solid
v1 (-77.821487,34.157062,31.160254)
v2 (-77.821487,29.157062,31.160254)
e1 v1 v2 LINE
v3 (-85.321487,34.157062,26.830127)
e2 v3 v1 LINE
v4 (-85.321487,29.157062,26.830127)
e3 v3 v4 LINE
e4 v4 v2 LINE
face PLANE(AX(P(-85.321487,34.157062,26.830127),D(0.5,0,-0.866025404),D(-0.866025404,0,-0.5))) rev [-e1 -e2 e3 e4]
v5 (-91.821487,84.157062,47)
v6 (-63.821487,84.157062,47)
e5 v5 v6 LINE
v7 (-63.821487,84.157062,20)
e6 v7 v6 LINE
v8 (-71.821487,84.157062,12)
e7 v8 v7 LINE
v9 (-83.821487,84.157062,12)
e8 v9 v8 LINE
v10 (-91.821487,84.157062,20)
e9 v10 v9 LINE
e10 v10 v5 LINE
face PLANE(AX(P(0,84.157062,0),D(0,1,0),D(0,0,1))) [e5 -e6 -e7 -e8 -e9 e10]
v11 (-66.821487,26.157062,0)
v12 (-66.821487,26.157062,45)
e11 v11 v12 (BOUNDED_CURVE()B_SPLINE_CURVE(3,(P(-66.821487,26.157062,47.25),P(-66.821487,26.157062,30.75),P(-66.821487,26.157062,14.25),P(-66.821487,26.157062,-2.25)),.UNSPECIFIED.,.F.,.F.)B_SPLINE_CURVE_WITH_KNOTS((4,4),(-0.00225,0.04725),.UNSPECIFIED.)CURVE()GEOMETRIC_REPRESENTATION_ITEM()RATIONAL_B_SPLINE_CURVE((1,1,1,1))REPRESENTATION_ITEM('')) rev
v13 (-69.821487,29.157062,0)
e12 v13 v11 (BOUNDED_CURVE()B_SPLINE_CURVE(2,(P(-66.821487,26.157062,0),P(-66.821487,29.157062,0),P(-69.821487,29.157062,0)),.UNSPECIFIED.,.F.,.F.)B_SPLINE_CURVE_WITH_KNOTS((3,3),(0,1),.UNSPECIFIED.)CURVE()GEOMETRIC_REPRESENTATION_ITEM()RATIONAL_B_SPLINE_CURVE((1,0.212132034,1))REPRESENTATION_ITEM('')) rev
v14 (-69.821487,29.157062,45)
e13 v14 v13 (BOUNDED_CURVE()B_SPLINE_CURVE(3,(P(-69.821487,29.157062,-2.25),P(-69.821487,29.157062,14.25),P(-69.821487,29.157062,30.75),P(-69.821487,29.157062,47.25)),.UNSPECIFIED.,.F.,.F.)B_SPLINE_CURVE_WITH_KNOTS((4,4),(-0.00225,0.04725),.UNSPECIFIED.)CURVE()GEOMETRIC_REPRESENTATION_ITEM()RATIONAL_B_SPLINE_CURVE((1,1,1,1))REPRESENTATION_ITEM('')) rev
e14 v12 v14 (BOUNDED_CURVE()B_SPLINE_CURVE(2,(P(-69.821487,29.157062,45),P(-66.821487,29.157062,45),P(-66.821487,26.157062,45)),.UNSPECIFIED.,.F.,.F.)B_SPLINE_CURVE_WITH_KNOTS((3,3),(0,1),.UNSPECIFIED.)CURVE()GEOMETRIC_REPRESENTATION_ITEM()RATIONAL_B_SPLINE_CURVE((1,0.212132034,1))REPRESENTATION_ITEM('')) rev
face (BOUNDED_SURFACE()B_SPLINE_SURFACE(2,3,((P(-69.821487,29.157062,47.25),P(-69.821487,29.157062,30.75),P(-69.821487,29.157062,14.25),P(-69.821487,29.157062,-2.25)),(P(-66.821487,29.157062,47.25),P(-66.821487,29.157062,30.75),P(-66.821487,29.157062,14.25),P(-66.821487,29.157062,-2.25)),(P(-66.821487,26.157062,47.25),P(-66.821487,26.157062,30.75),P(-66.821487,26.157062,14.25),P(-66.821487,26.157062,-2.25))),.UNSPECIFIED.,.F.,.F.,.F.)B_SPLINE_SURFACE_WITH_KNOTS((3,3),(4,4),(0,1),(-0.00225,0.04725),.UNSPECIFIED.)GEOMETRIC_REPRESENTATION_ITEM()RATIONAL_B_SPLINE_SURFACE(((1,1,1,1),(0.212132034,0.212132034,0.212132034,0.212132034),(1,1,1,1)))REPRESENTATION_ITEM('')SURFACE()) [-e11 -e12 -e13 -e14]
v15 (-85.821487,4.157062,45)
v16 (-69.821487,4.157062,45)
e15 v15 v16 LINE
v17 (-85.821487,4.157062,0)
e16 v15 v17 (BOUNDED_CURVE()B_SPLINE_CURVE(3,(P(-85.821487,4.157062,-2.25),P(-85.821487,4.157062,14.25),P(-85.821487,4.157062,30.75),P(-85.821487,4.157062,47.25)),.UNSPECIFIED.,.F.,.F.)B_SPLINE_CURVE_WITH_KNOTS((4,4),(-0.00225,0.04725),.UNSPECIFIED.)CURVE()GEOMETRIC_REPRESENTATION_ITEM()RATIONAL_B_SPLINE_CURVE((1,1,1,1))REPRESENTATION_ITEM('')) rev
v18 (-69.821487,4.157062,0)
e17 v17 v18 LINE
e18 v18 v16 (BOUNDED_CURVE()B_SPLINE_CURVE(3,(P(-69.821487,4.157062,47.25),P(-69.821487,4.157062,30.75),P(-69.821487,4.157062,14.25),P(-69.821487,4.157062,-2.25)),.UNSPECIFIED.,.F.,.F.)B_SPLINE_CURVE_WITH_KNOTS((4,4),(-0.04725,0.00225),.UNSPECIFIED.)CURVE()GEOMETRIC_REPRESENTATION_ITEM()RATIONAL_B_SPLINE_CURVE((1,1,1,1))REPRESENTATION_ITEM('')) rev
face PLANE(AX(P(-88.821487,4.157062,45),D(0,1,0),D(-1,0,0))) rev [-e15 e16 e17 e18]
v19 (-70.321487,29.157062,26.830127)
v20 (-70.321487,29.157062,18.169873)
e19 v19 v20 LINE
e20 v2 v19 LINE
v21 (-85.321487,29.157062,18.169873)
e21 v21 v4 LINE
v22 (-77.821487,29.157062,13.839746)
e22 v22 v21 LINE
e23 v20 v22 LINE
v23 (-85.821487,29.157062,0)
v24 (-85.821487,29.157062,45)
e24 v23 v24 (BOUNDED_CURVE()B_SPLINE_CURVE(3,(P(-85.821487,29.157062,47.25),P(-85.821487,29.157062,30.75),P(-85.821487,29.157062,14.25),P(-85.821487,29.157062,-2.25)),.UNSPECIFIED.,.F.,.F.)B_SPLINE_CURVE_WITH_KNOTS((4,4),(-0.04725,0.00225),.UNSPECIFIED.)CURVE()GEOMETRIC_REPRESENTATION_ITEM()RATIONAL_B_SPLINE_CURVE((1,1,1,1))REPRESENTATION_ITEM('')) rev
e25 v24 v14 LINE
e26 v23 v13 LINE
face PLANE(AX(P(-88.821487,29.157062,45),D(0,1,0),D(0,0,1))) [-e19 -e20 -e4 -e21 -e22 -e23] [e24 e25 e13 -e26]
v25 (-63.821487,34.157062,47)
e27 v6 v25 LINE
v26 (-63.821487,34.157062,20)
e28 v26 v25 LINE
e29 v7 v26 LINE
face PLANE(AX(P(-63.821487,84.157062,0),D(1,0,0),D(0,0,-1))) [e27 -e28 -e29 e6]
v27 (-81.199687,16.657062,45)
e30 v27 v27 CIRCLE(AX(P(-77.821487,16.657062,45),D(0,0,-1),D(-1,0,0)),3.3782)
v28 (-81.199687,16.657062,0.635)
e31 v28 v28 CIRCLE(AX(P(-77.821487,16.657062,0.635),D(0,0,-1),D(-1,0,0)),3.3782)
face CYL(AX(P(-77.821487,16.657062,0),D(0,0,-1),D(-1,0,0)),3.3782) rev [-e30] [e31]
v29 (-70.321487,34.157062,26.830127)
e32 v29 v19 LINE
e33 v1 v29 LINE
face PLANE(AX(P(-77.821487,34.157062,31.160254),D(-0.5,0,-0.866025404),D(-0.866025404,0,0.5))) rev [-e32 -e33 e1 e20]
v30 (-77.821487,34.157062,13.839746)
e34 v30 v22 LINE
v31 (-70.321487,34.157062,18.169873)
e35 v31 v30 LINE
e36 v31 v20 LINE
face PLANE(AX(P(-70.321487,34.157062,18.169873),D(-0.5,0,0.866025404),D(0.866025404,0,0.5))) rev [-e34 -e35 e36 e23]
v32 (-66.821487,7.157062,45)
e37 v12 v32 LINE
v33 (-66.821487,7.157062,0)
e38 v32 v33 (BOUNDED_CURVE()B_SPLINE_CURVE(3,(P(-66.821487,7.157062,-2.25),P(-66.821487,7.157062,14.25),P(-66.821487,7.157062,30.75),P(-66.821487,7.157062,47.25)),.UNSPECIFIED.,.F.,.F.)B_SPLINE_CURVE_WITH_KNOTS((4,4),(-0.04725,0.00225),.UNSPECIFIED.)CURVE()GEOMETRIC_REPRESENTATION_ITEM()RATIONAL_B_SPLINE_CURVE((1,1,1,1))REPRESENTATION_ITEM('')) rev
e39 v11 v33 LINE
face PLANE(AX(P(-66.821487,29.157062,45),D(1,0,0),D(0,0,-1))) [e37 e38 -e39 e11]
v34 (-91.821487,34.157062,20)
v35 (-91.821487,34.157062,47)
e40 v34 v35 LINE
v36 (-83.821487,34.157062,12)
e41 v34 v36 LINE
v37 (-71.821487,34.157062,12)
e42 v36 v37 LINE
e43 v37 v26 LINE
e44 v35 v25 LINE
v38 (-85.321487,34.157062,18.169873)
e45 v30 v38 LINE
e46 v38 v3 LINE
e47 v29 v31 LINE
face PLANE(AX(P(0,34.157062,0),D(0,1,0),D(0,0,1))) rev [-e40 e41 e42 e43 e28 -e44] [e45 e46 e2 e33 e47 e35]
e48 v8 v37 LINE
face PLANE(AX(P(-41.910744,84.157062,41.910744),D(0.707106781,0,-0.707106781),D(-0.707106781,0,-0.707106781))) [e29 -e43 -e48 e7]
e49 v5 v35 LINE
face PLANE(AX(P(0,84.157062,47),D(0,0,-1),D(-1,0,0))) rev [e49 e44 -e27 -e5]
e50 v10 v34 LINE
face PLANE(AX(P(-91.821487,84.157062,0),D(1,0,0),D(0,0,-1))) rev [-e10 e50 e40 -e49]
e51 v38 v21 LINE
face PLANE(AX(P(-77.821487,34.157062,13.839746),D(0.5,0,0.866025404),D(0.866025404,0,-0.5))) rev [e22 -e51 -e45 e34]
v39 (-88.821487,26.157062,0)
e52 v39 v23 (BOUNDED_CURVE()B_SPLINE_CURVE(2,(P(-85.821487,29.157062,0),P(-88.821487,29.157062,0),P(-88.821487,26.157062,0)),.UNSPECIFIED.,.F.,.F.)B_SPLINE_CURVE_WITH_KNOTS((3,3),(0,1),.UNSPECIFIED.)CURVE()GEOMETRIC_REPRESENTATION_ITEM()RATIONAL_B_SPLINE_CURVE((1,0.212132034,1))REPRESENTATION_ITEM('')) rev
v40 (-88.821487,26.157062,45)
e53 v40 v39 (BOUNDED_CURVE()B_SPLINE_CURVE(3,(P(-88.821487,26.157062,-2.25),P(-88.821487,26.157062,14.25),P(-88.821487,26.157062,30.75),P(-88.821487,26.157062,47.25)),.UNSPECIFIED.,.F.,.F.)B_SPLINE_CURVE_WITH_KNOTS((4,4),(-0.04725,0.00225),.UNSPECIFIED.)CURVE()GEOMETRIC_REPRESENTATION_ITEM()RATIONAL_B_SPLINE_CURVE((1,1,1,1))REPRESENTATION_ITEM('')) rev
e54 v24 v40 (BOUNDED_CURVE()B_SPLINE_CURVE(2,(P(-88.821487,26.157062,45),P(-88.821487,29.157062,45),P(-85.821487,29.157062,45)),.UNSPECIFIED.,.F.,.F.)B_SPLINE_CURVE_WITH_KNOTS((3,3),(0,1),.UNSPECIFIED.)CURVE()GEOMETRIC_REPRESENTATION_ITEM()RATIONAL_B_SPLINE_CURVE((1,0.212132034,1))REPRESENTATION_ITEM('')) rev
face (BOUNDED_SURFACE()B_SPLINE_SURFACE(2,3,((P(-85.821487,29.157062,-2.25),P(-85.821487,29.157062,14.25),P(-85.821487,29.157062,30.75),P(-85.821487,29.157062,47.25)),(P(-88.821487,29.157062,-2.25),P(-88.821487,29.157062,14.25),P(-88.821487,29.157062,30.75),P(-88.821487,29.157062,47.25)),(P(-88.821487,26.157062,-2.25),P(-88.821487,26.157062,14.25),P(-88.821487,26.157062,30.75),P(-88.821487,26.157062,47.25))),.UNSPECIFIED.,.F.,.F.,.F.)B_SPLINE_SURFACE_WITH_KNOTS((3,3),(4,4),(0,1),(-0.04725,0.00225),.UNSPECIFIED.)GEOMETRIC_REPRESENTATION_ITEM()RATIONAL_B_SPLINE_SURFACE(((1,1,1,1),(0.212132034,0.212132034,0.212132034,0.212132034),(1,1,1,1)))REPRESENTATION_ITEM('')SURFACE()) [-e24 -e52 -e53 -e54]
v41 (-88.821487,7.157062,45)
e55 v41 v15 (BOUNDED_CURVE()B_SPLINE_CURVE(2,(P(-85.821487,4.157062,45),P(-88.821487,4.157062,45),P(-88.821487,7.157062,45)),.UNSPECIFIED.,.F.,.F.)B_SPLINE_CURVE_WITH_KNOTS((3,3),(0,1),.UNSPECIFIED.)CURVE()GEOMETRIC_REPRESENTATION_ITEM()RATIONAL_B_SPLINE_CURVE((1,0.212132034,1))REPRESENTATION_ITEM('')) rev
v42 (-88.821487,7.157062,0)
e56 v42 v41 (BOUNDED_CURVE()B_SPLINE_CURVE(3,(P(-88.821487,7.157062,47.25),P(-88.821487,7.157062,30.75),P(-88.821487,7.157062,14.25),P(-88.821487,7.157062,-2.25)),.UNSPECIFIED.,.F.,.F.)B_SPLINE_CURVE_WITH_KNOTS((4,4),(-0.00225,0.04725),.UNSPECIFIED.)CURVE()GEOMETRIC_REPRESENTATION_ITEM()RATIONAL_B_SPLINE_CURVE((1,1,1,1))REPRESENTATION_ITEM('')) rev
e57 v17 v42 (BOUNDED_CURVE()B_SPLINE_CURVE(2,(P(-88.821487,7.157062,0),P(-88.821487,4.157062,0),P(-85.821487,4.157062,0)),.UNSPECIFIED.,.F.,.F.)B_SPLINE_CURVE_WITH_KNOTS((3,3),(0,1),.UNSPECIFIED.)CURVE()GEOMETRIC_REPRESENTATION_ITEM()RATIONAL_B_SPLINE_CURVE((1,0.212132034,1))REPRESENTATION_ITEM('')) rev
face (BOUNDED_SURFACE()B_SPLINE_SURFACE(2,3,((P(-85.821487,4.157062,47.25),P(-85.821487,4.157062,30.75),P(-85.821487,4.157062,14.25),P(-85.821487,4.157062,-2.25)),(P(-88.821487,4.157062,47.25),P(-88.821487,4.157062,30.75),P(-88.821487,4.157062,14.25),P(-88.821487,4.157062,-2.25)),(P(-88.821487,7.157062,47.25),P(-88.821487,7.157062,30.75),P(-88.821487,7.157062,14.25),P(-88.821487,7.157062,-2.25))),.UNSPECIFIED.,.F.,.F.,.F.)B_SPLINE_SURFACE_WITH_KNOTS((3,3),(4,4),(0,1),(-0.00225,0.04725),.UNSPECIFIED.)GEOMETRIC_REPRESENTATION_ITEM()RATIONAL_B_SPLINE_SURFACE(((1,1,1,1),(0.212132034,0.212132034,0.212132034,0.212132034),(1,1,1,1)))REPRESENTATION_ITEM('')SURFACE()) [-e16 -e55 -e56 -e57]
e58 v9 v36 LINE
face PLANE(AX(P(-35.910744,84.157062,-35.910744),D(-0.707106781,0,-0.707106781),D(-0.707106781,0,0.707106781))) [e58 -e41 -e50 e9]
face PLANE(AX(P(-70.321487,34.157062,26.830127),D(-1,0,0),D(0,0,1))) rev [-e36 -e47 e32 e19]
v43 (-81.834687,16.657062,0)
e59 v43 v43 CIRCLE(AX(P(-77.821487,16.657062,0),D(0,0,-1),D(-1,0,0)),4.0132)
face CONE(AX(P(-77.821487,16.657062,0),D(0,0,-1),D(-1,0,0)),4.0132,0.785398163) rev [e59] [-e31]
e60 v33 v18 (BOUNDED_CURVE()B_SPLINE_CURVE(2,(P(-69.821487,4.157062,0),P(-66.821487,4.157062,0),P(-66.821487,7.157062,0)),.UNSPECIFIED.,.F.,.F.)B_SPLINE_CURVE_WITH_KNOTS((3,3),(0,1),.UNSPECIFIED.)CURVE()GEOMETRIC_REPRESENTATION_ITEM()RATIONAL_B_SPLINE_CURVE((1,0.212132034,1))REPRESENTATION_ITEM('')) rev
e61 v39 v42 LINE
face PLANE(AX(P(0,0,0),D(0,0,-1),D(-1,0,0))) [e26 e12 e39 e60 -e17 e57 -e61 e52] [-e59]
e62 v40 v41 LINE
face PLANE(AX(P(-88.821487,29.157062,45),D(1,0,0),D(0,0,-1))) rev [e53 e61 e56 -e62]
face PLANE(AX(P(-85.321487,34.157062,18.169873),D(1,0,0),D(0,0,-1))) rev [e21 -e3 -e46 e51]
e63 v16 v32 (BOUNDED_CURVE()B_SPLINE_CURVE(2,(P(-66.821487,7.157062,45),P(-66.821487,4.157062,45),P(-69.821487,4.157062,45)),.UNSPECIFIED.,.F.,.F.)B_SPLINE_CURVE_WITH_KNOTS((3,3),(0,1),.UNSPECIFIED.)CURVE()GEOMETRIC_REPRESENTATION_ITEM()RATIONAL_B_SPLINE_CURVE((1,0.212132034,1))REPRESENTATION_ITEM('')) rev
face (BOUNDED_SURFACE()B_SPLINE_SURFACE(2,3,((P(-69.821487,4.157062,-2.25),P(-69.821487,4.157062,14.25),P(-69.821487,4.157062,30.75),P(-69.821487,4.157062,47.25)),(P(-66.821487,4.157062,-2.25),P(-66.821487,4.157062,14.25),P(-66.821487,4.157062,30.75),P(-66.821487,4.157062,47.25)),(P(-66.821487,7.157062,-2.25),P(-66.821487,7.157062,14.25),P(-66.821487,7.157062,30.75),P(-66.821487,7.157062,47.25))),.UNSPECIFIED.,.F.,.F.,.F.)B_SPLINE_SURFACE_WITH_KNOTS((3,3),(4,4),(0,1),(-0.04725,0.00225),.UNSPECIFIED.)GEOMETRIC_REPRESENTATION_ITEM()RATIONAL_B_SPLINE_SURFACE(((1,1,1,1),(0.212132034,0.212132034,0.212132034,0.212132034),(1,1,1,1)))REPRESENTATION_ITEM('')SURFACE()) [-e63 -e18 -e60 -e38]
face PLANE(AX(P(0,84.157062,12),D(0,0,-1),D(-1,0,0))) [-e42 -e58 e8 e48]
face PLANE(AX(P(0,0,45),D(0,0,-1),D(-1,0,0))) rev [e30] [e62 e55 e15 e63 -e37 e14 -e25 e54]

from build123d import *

# Parameters (mm, degrees)
ESQUISSE1_W                 = 22
ESQUISSE1_H                 = 25
BOSS_EXTRU_1_DEPTH          = 45
BOSS_EXTRU_2_DEPTH          = 5
BOSS_EXTRU_3_DEPTH          = 50
D_GAGEMENT_1_41_D           = 6.7564
D_GAGEMENT_1_41_CSINK_D     = 8.0264
D_GAGEMENT_1_41_CSINK_ANGLE = 90
CONG_1_SIZE                 = 3


with BuildPart() as part:
    # Esquisse1 → Boss.-Extru.1 (new body)
    with BuildSketch(Plane.XY):
        with Locations((-77.82148747, 16.657061647)):
            Rectangle(ESQUISSE1_W, ESQUISSE1_H)
    extrude(amount=BOSS_EXTRU_1_DEPTH)

    # Esquisse2 → Boss.-Extru.2 (add)
    with BuildSketch(Plane(origin=(0, 29.157061647, 0), x_dir=(1, 0, 0), z_dir=(0, 1, 0))):
        Polygon((-85.32148747, -18.169872981), (-85.32148747, -26.830127019), (-77.82148747, -31.160254038), (-70.32148747, -26.830127019), (-70.32148747, -18.169872981), (-77.82148747, -13.839745962), align=None)
    extrude(amount=BOSS_EXTRU_2_DEPTH)

    # Esquisse4 → Boss.-Extru.3 (add)
    # profile 1 of 2: a face of its own
    with BuildSketch(Plane(origin=(0, 34.157061647, 0), x_dir=(1, 0, 0), z_dir=(0, 1, 0))):
        Polygon((-71.82148747, -12), (-63.82148747, -20), (-63.82148747, -47), (-91.82148747, -47), (-91.82148747, -20), (-83.82148747, -12), align=None)
        Polygon((-77.82148747, -13.839745962), (-85.32148747, -18.169872981), (-85.32148747, -26.830127019), (-77.82148747, -31.160254038), (-70.32148747, -26.830127019), (-70.32148747, -18.169872981), align=None, mode=Mode.SUBTRACT)
    # profile 2 of 2: a face of its own
    with BuildSketch(Plane(origin=(0, 34.157061647, 0), x_dir=(1, 0, 0), z_dir=(0, 1, 0))):
        Polygon((-70.32148747, -18.169872981), (-77.82148747, -13.839745962), (-85.32148747, -18.169872981), (-85.32148747, -26.830127019), (-77.82148747, -31.160254038), (-70.32148747, -26.830127019), align=None)
    extrude(amount=BOSS_EXTRU_3_DEPTH)

    # Dégagement 1/41 (through all)
    with Locations(Plane(origin=(0, 0, 0), x_dir=(-1, 0, 0), z_dir=(0, 0, -1))):
        with Locations((77.82148747, 16.657061647)):
            CounterSinkHole(D_GAGEMENT_1_41_D / 2, D_GAGEMENT_1_41_CSINK_D / 2, counter_sink_angle=D_GAGEMENT_1_41_CSINK_ANGLE)

    # Congé1
    # a fillet whose section is not a circle: 3 mm, written as the material it takes off along each edge
    with BuildSketch(Plane(origin=(-88.82148747, 4.157061647, -7.5), x_dir=(1, 0, 0), z_dir=(0, 0, 1)), Plane(origin=(-66.82148747, 29.157061647, -7.5), x_dir=(-1, 0, 0), z_dir=(0, 0, 1)), Plane(origin=(-66.82148747, 4.157061647, -7.5), x_dir=(0, 1, 0), z_dir=(0, 0, 1))) as cong_1_piece_1:
        with BuildLine():
            Bezier((CONG_1_SIZE, 0), (0, 0), (0, CONG_1_SIZE), weights=[1, 0.212132034, 1])
            Line((0, CONG_1_SIZE), (0, 0))
            Line((0, 0), (CONG_1_SIZE, 0))
        make_face()
    extrude(amount=60, mode=Mode.SUBTRACT)
    with BuildSketch(Plane(origin=(-88.82148747, 29.157061647, -7.5), x_dir=(1, 0, 0), z_dir=(0, 0, 1))) as cong_1_piece_2:
        with BuildLine():
            Bezier((CONG_1_SIZE, 0), (0, 0), (0, -CONG_1_SIZE), weights=[1, 0.212132034, 1])
            Line((0, -CONG_1_SIZE), (0, 0))
            Line((0, 0), (CONG_1_SIZE, 0))
        make_face()
    extrude(amount=60, mode=Mode.SUBTRACT)


solid = part.part
